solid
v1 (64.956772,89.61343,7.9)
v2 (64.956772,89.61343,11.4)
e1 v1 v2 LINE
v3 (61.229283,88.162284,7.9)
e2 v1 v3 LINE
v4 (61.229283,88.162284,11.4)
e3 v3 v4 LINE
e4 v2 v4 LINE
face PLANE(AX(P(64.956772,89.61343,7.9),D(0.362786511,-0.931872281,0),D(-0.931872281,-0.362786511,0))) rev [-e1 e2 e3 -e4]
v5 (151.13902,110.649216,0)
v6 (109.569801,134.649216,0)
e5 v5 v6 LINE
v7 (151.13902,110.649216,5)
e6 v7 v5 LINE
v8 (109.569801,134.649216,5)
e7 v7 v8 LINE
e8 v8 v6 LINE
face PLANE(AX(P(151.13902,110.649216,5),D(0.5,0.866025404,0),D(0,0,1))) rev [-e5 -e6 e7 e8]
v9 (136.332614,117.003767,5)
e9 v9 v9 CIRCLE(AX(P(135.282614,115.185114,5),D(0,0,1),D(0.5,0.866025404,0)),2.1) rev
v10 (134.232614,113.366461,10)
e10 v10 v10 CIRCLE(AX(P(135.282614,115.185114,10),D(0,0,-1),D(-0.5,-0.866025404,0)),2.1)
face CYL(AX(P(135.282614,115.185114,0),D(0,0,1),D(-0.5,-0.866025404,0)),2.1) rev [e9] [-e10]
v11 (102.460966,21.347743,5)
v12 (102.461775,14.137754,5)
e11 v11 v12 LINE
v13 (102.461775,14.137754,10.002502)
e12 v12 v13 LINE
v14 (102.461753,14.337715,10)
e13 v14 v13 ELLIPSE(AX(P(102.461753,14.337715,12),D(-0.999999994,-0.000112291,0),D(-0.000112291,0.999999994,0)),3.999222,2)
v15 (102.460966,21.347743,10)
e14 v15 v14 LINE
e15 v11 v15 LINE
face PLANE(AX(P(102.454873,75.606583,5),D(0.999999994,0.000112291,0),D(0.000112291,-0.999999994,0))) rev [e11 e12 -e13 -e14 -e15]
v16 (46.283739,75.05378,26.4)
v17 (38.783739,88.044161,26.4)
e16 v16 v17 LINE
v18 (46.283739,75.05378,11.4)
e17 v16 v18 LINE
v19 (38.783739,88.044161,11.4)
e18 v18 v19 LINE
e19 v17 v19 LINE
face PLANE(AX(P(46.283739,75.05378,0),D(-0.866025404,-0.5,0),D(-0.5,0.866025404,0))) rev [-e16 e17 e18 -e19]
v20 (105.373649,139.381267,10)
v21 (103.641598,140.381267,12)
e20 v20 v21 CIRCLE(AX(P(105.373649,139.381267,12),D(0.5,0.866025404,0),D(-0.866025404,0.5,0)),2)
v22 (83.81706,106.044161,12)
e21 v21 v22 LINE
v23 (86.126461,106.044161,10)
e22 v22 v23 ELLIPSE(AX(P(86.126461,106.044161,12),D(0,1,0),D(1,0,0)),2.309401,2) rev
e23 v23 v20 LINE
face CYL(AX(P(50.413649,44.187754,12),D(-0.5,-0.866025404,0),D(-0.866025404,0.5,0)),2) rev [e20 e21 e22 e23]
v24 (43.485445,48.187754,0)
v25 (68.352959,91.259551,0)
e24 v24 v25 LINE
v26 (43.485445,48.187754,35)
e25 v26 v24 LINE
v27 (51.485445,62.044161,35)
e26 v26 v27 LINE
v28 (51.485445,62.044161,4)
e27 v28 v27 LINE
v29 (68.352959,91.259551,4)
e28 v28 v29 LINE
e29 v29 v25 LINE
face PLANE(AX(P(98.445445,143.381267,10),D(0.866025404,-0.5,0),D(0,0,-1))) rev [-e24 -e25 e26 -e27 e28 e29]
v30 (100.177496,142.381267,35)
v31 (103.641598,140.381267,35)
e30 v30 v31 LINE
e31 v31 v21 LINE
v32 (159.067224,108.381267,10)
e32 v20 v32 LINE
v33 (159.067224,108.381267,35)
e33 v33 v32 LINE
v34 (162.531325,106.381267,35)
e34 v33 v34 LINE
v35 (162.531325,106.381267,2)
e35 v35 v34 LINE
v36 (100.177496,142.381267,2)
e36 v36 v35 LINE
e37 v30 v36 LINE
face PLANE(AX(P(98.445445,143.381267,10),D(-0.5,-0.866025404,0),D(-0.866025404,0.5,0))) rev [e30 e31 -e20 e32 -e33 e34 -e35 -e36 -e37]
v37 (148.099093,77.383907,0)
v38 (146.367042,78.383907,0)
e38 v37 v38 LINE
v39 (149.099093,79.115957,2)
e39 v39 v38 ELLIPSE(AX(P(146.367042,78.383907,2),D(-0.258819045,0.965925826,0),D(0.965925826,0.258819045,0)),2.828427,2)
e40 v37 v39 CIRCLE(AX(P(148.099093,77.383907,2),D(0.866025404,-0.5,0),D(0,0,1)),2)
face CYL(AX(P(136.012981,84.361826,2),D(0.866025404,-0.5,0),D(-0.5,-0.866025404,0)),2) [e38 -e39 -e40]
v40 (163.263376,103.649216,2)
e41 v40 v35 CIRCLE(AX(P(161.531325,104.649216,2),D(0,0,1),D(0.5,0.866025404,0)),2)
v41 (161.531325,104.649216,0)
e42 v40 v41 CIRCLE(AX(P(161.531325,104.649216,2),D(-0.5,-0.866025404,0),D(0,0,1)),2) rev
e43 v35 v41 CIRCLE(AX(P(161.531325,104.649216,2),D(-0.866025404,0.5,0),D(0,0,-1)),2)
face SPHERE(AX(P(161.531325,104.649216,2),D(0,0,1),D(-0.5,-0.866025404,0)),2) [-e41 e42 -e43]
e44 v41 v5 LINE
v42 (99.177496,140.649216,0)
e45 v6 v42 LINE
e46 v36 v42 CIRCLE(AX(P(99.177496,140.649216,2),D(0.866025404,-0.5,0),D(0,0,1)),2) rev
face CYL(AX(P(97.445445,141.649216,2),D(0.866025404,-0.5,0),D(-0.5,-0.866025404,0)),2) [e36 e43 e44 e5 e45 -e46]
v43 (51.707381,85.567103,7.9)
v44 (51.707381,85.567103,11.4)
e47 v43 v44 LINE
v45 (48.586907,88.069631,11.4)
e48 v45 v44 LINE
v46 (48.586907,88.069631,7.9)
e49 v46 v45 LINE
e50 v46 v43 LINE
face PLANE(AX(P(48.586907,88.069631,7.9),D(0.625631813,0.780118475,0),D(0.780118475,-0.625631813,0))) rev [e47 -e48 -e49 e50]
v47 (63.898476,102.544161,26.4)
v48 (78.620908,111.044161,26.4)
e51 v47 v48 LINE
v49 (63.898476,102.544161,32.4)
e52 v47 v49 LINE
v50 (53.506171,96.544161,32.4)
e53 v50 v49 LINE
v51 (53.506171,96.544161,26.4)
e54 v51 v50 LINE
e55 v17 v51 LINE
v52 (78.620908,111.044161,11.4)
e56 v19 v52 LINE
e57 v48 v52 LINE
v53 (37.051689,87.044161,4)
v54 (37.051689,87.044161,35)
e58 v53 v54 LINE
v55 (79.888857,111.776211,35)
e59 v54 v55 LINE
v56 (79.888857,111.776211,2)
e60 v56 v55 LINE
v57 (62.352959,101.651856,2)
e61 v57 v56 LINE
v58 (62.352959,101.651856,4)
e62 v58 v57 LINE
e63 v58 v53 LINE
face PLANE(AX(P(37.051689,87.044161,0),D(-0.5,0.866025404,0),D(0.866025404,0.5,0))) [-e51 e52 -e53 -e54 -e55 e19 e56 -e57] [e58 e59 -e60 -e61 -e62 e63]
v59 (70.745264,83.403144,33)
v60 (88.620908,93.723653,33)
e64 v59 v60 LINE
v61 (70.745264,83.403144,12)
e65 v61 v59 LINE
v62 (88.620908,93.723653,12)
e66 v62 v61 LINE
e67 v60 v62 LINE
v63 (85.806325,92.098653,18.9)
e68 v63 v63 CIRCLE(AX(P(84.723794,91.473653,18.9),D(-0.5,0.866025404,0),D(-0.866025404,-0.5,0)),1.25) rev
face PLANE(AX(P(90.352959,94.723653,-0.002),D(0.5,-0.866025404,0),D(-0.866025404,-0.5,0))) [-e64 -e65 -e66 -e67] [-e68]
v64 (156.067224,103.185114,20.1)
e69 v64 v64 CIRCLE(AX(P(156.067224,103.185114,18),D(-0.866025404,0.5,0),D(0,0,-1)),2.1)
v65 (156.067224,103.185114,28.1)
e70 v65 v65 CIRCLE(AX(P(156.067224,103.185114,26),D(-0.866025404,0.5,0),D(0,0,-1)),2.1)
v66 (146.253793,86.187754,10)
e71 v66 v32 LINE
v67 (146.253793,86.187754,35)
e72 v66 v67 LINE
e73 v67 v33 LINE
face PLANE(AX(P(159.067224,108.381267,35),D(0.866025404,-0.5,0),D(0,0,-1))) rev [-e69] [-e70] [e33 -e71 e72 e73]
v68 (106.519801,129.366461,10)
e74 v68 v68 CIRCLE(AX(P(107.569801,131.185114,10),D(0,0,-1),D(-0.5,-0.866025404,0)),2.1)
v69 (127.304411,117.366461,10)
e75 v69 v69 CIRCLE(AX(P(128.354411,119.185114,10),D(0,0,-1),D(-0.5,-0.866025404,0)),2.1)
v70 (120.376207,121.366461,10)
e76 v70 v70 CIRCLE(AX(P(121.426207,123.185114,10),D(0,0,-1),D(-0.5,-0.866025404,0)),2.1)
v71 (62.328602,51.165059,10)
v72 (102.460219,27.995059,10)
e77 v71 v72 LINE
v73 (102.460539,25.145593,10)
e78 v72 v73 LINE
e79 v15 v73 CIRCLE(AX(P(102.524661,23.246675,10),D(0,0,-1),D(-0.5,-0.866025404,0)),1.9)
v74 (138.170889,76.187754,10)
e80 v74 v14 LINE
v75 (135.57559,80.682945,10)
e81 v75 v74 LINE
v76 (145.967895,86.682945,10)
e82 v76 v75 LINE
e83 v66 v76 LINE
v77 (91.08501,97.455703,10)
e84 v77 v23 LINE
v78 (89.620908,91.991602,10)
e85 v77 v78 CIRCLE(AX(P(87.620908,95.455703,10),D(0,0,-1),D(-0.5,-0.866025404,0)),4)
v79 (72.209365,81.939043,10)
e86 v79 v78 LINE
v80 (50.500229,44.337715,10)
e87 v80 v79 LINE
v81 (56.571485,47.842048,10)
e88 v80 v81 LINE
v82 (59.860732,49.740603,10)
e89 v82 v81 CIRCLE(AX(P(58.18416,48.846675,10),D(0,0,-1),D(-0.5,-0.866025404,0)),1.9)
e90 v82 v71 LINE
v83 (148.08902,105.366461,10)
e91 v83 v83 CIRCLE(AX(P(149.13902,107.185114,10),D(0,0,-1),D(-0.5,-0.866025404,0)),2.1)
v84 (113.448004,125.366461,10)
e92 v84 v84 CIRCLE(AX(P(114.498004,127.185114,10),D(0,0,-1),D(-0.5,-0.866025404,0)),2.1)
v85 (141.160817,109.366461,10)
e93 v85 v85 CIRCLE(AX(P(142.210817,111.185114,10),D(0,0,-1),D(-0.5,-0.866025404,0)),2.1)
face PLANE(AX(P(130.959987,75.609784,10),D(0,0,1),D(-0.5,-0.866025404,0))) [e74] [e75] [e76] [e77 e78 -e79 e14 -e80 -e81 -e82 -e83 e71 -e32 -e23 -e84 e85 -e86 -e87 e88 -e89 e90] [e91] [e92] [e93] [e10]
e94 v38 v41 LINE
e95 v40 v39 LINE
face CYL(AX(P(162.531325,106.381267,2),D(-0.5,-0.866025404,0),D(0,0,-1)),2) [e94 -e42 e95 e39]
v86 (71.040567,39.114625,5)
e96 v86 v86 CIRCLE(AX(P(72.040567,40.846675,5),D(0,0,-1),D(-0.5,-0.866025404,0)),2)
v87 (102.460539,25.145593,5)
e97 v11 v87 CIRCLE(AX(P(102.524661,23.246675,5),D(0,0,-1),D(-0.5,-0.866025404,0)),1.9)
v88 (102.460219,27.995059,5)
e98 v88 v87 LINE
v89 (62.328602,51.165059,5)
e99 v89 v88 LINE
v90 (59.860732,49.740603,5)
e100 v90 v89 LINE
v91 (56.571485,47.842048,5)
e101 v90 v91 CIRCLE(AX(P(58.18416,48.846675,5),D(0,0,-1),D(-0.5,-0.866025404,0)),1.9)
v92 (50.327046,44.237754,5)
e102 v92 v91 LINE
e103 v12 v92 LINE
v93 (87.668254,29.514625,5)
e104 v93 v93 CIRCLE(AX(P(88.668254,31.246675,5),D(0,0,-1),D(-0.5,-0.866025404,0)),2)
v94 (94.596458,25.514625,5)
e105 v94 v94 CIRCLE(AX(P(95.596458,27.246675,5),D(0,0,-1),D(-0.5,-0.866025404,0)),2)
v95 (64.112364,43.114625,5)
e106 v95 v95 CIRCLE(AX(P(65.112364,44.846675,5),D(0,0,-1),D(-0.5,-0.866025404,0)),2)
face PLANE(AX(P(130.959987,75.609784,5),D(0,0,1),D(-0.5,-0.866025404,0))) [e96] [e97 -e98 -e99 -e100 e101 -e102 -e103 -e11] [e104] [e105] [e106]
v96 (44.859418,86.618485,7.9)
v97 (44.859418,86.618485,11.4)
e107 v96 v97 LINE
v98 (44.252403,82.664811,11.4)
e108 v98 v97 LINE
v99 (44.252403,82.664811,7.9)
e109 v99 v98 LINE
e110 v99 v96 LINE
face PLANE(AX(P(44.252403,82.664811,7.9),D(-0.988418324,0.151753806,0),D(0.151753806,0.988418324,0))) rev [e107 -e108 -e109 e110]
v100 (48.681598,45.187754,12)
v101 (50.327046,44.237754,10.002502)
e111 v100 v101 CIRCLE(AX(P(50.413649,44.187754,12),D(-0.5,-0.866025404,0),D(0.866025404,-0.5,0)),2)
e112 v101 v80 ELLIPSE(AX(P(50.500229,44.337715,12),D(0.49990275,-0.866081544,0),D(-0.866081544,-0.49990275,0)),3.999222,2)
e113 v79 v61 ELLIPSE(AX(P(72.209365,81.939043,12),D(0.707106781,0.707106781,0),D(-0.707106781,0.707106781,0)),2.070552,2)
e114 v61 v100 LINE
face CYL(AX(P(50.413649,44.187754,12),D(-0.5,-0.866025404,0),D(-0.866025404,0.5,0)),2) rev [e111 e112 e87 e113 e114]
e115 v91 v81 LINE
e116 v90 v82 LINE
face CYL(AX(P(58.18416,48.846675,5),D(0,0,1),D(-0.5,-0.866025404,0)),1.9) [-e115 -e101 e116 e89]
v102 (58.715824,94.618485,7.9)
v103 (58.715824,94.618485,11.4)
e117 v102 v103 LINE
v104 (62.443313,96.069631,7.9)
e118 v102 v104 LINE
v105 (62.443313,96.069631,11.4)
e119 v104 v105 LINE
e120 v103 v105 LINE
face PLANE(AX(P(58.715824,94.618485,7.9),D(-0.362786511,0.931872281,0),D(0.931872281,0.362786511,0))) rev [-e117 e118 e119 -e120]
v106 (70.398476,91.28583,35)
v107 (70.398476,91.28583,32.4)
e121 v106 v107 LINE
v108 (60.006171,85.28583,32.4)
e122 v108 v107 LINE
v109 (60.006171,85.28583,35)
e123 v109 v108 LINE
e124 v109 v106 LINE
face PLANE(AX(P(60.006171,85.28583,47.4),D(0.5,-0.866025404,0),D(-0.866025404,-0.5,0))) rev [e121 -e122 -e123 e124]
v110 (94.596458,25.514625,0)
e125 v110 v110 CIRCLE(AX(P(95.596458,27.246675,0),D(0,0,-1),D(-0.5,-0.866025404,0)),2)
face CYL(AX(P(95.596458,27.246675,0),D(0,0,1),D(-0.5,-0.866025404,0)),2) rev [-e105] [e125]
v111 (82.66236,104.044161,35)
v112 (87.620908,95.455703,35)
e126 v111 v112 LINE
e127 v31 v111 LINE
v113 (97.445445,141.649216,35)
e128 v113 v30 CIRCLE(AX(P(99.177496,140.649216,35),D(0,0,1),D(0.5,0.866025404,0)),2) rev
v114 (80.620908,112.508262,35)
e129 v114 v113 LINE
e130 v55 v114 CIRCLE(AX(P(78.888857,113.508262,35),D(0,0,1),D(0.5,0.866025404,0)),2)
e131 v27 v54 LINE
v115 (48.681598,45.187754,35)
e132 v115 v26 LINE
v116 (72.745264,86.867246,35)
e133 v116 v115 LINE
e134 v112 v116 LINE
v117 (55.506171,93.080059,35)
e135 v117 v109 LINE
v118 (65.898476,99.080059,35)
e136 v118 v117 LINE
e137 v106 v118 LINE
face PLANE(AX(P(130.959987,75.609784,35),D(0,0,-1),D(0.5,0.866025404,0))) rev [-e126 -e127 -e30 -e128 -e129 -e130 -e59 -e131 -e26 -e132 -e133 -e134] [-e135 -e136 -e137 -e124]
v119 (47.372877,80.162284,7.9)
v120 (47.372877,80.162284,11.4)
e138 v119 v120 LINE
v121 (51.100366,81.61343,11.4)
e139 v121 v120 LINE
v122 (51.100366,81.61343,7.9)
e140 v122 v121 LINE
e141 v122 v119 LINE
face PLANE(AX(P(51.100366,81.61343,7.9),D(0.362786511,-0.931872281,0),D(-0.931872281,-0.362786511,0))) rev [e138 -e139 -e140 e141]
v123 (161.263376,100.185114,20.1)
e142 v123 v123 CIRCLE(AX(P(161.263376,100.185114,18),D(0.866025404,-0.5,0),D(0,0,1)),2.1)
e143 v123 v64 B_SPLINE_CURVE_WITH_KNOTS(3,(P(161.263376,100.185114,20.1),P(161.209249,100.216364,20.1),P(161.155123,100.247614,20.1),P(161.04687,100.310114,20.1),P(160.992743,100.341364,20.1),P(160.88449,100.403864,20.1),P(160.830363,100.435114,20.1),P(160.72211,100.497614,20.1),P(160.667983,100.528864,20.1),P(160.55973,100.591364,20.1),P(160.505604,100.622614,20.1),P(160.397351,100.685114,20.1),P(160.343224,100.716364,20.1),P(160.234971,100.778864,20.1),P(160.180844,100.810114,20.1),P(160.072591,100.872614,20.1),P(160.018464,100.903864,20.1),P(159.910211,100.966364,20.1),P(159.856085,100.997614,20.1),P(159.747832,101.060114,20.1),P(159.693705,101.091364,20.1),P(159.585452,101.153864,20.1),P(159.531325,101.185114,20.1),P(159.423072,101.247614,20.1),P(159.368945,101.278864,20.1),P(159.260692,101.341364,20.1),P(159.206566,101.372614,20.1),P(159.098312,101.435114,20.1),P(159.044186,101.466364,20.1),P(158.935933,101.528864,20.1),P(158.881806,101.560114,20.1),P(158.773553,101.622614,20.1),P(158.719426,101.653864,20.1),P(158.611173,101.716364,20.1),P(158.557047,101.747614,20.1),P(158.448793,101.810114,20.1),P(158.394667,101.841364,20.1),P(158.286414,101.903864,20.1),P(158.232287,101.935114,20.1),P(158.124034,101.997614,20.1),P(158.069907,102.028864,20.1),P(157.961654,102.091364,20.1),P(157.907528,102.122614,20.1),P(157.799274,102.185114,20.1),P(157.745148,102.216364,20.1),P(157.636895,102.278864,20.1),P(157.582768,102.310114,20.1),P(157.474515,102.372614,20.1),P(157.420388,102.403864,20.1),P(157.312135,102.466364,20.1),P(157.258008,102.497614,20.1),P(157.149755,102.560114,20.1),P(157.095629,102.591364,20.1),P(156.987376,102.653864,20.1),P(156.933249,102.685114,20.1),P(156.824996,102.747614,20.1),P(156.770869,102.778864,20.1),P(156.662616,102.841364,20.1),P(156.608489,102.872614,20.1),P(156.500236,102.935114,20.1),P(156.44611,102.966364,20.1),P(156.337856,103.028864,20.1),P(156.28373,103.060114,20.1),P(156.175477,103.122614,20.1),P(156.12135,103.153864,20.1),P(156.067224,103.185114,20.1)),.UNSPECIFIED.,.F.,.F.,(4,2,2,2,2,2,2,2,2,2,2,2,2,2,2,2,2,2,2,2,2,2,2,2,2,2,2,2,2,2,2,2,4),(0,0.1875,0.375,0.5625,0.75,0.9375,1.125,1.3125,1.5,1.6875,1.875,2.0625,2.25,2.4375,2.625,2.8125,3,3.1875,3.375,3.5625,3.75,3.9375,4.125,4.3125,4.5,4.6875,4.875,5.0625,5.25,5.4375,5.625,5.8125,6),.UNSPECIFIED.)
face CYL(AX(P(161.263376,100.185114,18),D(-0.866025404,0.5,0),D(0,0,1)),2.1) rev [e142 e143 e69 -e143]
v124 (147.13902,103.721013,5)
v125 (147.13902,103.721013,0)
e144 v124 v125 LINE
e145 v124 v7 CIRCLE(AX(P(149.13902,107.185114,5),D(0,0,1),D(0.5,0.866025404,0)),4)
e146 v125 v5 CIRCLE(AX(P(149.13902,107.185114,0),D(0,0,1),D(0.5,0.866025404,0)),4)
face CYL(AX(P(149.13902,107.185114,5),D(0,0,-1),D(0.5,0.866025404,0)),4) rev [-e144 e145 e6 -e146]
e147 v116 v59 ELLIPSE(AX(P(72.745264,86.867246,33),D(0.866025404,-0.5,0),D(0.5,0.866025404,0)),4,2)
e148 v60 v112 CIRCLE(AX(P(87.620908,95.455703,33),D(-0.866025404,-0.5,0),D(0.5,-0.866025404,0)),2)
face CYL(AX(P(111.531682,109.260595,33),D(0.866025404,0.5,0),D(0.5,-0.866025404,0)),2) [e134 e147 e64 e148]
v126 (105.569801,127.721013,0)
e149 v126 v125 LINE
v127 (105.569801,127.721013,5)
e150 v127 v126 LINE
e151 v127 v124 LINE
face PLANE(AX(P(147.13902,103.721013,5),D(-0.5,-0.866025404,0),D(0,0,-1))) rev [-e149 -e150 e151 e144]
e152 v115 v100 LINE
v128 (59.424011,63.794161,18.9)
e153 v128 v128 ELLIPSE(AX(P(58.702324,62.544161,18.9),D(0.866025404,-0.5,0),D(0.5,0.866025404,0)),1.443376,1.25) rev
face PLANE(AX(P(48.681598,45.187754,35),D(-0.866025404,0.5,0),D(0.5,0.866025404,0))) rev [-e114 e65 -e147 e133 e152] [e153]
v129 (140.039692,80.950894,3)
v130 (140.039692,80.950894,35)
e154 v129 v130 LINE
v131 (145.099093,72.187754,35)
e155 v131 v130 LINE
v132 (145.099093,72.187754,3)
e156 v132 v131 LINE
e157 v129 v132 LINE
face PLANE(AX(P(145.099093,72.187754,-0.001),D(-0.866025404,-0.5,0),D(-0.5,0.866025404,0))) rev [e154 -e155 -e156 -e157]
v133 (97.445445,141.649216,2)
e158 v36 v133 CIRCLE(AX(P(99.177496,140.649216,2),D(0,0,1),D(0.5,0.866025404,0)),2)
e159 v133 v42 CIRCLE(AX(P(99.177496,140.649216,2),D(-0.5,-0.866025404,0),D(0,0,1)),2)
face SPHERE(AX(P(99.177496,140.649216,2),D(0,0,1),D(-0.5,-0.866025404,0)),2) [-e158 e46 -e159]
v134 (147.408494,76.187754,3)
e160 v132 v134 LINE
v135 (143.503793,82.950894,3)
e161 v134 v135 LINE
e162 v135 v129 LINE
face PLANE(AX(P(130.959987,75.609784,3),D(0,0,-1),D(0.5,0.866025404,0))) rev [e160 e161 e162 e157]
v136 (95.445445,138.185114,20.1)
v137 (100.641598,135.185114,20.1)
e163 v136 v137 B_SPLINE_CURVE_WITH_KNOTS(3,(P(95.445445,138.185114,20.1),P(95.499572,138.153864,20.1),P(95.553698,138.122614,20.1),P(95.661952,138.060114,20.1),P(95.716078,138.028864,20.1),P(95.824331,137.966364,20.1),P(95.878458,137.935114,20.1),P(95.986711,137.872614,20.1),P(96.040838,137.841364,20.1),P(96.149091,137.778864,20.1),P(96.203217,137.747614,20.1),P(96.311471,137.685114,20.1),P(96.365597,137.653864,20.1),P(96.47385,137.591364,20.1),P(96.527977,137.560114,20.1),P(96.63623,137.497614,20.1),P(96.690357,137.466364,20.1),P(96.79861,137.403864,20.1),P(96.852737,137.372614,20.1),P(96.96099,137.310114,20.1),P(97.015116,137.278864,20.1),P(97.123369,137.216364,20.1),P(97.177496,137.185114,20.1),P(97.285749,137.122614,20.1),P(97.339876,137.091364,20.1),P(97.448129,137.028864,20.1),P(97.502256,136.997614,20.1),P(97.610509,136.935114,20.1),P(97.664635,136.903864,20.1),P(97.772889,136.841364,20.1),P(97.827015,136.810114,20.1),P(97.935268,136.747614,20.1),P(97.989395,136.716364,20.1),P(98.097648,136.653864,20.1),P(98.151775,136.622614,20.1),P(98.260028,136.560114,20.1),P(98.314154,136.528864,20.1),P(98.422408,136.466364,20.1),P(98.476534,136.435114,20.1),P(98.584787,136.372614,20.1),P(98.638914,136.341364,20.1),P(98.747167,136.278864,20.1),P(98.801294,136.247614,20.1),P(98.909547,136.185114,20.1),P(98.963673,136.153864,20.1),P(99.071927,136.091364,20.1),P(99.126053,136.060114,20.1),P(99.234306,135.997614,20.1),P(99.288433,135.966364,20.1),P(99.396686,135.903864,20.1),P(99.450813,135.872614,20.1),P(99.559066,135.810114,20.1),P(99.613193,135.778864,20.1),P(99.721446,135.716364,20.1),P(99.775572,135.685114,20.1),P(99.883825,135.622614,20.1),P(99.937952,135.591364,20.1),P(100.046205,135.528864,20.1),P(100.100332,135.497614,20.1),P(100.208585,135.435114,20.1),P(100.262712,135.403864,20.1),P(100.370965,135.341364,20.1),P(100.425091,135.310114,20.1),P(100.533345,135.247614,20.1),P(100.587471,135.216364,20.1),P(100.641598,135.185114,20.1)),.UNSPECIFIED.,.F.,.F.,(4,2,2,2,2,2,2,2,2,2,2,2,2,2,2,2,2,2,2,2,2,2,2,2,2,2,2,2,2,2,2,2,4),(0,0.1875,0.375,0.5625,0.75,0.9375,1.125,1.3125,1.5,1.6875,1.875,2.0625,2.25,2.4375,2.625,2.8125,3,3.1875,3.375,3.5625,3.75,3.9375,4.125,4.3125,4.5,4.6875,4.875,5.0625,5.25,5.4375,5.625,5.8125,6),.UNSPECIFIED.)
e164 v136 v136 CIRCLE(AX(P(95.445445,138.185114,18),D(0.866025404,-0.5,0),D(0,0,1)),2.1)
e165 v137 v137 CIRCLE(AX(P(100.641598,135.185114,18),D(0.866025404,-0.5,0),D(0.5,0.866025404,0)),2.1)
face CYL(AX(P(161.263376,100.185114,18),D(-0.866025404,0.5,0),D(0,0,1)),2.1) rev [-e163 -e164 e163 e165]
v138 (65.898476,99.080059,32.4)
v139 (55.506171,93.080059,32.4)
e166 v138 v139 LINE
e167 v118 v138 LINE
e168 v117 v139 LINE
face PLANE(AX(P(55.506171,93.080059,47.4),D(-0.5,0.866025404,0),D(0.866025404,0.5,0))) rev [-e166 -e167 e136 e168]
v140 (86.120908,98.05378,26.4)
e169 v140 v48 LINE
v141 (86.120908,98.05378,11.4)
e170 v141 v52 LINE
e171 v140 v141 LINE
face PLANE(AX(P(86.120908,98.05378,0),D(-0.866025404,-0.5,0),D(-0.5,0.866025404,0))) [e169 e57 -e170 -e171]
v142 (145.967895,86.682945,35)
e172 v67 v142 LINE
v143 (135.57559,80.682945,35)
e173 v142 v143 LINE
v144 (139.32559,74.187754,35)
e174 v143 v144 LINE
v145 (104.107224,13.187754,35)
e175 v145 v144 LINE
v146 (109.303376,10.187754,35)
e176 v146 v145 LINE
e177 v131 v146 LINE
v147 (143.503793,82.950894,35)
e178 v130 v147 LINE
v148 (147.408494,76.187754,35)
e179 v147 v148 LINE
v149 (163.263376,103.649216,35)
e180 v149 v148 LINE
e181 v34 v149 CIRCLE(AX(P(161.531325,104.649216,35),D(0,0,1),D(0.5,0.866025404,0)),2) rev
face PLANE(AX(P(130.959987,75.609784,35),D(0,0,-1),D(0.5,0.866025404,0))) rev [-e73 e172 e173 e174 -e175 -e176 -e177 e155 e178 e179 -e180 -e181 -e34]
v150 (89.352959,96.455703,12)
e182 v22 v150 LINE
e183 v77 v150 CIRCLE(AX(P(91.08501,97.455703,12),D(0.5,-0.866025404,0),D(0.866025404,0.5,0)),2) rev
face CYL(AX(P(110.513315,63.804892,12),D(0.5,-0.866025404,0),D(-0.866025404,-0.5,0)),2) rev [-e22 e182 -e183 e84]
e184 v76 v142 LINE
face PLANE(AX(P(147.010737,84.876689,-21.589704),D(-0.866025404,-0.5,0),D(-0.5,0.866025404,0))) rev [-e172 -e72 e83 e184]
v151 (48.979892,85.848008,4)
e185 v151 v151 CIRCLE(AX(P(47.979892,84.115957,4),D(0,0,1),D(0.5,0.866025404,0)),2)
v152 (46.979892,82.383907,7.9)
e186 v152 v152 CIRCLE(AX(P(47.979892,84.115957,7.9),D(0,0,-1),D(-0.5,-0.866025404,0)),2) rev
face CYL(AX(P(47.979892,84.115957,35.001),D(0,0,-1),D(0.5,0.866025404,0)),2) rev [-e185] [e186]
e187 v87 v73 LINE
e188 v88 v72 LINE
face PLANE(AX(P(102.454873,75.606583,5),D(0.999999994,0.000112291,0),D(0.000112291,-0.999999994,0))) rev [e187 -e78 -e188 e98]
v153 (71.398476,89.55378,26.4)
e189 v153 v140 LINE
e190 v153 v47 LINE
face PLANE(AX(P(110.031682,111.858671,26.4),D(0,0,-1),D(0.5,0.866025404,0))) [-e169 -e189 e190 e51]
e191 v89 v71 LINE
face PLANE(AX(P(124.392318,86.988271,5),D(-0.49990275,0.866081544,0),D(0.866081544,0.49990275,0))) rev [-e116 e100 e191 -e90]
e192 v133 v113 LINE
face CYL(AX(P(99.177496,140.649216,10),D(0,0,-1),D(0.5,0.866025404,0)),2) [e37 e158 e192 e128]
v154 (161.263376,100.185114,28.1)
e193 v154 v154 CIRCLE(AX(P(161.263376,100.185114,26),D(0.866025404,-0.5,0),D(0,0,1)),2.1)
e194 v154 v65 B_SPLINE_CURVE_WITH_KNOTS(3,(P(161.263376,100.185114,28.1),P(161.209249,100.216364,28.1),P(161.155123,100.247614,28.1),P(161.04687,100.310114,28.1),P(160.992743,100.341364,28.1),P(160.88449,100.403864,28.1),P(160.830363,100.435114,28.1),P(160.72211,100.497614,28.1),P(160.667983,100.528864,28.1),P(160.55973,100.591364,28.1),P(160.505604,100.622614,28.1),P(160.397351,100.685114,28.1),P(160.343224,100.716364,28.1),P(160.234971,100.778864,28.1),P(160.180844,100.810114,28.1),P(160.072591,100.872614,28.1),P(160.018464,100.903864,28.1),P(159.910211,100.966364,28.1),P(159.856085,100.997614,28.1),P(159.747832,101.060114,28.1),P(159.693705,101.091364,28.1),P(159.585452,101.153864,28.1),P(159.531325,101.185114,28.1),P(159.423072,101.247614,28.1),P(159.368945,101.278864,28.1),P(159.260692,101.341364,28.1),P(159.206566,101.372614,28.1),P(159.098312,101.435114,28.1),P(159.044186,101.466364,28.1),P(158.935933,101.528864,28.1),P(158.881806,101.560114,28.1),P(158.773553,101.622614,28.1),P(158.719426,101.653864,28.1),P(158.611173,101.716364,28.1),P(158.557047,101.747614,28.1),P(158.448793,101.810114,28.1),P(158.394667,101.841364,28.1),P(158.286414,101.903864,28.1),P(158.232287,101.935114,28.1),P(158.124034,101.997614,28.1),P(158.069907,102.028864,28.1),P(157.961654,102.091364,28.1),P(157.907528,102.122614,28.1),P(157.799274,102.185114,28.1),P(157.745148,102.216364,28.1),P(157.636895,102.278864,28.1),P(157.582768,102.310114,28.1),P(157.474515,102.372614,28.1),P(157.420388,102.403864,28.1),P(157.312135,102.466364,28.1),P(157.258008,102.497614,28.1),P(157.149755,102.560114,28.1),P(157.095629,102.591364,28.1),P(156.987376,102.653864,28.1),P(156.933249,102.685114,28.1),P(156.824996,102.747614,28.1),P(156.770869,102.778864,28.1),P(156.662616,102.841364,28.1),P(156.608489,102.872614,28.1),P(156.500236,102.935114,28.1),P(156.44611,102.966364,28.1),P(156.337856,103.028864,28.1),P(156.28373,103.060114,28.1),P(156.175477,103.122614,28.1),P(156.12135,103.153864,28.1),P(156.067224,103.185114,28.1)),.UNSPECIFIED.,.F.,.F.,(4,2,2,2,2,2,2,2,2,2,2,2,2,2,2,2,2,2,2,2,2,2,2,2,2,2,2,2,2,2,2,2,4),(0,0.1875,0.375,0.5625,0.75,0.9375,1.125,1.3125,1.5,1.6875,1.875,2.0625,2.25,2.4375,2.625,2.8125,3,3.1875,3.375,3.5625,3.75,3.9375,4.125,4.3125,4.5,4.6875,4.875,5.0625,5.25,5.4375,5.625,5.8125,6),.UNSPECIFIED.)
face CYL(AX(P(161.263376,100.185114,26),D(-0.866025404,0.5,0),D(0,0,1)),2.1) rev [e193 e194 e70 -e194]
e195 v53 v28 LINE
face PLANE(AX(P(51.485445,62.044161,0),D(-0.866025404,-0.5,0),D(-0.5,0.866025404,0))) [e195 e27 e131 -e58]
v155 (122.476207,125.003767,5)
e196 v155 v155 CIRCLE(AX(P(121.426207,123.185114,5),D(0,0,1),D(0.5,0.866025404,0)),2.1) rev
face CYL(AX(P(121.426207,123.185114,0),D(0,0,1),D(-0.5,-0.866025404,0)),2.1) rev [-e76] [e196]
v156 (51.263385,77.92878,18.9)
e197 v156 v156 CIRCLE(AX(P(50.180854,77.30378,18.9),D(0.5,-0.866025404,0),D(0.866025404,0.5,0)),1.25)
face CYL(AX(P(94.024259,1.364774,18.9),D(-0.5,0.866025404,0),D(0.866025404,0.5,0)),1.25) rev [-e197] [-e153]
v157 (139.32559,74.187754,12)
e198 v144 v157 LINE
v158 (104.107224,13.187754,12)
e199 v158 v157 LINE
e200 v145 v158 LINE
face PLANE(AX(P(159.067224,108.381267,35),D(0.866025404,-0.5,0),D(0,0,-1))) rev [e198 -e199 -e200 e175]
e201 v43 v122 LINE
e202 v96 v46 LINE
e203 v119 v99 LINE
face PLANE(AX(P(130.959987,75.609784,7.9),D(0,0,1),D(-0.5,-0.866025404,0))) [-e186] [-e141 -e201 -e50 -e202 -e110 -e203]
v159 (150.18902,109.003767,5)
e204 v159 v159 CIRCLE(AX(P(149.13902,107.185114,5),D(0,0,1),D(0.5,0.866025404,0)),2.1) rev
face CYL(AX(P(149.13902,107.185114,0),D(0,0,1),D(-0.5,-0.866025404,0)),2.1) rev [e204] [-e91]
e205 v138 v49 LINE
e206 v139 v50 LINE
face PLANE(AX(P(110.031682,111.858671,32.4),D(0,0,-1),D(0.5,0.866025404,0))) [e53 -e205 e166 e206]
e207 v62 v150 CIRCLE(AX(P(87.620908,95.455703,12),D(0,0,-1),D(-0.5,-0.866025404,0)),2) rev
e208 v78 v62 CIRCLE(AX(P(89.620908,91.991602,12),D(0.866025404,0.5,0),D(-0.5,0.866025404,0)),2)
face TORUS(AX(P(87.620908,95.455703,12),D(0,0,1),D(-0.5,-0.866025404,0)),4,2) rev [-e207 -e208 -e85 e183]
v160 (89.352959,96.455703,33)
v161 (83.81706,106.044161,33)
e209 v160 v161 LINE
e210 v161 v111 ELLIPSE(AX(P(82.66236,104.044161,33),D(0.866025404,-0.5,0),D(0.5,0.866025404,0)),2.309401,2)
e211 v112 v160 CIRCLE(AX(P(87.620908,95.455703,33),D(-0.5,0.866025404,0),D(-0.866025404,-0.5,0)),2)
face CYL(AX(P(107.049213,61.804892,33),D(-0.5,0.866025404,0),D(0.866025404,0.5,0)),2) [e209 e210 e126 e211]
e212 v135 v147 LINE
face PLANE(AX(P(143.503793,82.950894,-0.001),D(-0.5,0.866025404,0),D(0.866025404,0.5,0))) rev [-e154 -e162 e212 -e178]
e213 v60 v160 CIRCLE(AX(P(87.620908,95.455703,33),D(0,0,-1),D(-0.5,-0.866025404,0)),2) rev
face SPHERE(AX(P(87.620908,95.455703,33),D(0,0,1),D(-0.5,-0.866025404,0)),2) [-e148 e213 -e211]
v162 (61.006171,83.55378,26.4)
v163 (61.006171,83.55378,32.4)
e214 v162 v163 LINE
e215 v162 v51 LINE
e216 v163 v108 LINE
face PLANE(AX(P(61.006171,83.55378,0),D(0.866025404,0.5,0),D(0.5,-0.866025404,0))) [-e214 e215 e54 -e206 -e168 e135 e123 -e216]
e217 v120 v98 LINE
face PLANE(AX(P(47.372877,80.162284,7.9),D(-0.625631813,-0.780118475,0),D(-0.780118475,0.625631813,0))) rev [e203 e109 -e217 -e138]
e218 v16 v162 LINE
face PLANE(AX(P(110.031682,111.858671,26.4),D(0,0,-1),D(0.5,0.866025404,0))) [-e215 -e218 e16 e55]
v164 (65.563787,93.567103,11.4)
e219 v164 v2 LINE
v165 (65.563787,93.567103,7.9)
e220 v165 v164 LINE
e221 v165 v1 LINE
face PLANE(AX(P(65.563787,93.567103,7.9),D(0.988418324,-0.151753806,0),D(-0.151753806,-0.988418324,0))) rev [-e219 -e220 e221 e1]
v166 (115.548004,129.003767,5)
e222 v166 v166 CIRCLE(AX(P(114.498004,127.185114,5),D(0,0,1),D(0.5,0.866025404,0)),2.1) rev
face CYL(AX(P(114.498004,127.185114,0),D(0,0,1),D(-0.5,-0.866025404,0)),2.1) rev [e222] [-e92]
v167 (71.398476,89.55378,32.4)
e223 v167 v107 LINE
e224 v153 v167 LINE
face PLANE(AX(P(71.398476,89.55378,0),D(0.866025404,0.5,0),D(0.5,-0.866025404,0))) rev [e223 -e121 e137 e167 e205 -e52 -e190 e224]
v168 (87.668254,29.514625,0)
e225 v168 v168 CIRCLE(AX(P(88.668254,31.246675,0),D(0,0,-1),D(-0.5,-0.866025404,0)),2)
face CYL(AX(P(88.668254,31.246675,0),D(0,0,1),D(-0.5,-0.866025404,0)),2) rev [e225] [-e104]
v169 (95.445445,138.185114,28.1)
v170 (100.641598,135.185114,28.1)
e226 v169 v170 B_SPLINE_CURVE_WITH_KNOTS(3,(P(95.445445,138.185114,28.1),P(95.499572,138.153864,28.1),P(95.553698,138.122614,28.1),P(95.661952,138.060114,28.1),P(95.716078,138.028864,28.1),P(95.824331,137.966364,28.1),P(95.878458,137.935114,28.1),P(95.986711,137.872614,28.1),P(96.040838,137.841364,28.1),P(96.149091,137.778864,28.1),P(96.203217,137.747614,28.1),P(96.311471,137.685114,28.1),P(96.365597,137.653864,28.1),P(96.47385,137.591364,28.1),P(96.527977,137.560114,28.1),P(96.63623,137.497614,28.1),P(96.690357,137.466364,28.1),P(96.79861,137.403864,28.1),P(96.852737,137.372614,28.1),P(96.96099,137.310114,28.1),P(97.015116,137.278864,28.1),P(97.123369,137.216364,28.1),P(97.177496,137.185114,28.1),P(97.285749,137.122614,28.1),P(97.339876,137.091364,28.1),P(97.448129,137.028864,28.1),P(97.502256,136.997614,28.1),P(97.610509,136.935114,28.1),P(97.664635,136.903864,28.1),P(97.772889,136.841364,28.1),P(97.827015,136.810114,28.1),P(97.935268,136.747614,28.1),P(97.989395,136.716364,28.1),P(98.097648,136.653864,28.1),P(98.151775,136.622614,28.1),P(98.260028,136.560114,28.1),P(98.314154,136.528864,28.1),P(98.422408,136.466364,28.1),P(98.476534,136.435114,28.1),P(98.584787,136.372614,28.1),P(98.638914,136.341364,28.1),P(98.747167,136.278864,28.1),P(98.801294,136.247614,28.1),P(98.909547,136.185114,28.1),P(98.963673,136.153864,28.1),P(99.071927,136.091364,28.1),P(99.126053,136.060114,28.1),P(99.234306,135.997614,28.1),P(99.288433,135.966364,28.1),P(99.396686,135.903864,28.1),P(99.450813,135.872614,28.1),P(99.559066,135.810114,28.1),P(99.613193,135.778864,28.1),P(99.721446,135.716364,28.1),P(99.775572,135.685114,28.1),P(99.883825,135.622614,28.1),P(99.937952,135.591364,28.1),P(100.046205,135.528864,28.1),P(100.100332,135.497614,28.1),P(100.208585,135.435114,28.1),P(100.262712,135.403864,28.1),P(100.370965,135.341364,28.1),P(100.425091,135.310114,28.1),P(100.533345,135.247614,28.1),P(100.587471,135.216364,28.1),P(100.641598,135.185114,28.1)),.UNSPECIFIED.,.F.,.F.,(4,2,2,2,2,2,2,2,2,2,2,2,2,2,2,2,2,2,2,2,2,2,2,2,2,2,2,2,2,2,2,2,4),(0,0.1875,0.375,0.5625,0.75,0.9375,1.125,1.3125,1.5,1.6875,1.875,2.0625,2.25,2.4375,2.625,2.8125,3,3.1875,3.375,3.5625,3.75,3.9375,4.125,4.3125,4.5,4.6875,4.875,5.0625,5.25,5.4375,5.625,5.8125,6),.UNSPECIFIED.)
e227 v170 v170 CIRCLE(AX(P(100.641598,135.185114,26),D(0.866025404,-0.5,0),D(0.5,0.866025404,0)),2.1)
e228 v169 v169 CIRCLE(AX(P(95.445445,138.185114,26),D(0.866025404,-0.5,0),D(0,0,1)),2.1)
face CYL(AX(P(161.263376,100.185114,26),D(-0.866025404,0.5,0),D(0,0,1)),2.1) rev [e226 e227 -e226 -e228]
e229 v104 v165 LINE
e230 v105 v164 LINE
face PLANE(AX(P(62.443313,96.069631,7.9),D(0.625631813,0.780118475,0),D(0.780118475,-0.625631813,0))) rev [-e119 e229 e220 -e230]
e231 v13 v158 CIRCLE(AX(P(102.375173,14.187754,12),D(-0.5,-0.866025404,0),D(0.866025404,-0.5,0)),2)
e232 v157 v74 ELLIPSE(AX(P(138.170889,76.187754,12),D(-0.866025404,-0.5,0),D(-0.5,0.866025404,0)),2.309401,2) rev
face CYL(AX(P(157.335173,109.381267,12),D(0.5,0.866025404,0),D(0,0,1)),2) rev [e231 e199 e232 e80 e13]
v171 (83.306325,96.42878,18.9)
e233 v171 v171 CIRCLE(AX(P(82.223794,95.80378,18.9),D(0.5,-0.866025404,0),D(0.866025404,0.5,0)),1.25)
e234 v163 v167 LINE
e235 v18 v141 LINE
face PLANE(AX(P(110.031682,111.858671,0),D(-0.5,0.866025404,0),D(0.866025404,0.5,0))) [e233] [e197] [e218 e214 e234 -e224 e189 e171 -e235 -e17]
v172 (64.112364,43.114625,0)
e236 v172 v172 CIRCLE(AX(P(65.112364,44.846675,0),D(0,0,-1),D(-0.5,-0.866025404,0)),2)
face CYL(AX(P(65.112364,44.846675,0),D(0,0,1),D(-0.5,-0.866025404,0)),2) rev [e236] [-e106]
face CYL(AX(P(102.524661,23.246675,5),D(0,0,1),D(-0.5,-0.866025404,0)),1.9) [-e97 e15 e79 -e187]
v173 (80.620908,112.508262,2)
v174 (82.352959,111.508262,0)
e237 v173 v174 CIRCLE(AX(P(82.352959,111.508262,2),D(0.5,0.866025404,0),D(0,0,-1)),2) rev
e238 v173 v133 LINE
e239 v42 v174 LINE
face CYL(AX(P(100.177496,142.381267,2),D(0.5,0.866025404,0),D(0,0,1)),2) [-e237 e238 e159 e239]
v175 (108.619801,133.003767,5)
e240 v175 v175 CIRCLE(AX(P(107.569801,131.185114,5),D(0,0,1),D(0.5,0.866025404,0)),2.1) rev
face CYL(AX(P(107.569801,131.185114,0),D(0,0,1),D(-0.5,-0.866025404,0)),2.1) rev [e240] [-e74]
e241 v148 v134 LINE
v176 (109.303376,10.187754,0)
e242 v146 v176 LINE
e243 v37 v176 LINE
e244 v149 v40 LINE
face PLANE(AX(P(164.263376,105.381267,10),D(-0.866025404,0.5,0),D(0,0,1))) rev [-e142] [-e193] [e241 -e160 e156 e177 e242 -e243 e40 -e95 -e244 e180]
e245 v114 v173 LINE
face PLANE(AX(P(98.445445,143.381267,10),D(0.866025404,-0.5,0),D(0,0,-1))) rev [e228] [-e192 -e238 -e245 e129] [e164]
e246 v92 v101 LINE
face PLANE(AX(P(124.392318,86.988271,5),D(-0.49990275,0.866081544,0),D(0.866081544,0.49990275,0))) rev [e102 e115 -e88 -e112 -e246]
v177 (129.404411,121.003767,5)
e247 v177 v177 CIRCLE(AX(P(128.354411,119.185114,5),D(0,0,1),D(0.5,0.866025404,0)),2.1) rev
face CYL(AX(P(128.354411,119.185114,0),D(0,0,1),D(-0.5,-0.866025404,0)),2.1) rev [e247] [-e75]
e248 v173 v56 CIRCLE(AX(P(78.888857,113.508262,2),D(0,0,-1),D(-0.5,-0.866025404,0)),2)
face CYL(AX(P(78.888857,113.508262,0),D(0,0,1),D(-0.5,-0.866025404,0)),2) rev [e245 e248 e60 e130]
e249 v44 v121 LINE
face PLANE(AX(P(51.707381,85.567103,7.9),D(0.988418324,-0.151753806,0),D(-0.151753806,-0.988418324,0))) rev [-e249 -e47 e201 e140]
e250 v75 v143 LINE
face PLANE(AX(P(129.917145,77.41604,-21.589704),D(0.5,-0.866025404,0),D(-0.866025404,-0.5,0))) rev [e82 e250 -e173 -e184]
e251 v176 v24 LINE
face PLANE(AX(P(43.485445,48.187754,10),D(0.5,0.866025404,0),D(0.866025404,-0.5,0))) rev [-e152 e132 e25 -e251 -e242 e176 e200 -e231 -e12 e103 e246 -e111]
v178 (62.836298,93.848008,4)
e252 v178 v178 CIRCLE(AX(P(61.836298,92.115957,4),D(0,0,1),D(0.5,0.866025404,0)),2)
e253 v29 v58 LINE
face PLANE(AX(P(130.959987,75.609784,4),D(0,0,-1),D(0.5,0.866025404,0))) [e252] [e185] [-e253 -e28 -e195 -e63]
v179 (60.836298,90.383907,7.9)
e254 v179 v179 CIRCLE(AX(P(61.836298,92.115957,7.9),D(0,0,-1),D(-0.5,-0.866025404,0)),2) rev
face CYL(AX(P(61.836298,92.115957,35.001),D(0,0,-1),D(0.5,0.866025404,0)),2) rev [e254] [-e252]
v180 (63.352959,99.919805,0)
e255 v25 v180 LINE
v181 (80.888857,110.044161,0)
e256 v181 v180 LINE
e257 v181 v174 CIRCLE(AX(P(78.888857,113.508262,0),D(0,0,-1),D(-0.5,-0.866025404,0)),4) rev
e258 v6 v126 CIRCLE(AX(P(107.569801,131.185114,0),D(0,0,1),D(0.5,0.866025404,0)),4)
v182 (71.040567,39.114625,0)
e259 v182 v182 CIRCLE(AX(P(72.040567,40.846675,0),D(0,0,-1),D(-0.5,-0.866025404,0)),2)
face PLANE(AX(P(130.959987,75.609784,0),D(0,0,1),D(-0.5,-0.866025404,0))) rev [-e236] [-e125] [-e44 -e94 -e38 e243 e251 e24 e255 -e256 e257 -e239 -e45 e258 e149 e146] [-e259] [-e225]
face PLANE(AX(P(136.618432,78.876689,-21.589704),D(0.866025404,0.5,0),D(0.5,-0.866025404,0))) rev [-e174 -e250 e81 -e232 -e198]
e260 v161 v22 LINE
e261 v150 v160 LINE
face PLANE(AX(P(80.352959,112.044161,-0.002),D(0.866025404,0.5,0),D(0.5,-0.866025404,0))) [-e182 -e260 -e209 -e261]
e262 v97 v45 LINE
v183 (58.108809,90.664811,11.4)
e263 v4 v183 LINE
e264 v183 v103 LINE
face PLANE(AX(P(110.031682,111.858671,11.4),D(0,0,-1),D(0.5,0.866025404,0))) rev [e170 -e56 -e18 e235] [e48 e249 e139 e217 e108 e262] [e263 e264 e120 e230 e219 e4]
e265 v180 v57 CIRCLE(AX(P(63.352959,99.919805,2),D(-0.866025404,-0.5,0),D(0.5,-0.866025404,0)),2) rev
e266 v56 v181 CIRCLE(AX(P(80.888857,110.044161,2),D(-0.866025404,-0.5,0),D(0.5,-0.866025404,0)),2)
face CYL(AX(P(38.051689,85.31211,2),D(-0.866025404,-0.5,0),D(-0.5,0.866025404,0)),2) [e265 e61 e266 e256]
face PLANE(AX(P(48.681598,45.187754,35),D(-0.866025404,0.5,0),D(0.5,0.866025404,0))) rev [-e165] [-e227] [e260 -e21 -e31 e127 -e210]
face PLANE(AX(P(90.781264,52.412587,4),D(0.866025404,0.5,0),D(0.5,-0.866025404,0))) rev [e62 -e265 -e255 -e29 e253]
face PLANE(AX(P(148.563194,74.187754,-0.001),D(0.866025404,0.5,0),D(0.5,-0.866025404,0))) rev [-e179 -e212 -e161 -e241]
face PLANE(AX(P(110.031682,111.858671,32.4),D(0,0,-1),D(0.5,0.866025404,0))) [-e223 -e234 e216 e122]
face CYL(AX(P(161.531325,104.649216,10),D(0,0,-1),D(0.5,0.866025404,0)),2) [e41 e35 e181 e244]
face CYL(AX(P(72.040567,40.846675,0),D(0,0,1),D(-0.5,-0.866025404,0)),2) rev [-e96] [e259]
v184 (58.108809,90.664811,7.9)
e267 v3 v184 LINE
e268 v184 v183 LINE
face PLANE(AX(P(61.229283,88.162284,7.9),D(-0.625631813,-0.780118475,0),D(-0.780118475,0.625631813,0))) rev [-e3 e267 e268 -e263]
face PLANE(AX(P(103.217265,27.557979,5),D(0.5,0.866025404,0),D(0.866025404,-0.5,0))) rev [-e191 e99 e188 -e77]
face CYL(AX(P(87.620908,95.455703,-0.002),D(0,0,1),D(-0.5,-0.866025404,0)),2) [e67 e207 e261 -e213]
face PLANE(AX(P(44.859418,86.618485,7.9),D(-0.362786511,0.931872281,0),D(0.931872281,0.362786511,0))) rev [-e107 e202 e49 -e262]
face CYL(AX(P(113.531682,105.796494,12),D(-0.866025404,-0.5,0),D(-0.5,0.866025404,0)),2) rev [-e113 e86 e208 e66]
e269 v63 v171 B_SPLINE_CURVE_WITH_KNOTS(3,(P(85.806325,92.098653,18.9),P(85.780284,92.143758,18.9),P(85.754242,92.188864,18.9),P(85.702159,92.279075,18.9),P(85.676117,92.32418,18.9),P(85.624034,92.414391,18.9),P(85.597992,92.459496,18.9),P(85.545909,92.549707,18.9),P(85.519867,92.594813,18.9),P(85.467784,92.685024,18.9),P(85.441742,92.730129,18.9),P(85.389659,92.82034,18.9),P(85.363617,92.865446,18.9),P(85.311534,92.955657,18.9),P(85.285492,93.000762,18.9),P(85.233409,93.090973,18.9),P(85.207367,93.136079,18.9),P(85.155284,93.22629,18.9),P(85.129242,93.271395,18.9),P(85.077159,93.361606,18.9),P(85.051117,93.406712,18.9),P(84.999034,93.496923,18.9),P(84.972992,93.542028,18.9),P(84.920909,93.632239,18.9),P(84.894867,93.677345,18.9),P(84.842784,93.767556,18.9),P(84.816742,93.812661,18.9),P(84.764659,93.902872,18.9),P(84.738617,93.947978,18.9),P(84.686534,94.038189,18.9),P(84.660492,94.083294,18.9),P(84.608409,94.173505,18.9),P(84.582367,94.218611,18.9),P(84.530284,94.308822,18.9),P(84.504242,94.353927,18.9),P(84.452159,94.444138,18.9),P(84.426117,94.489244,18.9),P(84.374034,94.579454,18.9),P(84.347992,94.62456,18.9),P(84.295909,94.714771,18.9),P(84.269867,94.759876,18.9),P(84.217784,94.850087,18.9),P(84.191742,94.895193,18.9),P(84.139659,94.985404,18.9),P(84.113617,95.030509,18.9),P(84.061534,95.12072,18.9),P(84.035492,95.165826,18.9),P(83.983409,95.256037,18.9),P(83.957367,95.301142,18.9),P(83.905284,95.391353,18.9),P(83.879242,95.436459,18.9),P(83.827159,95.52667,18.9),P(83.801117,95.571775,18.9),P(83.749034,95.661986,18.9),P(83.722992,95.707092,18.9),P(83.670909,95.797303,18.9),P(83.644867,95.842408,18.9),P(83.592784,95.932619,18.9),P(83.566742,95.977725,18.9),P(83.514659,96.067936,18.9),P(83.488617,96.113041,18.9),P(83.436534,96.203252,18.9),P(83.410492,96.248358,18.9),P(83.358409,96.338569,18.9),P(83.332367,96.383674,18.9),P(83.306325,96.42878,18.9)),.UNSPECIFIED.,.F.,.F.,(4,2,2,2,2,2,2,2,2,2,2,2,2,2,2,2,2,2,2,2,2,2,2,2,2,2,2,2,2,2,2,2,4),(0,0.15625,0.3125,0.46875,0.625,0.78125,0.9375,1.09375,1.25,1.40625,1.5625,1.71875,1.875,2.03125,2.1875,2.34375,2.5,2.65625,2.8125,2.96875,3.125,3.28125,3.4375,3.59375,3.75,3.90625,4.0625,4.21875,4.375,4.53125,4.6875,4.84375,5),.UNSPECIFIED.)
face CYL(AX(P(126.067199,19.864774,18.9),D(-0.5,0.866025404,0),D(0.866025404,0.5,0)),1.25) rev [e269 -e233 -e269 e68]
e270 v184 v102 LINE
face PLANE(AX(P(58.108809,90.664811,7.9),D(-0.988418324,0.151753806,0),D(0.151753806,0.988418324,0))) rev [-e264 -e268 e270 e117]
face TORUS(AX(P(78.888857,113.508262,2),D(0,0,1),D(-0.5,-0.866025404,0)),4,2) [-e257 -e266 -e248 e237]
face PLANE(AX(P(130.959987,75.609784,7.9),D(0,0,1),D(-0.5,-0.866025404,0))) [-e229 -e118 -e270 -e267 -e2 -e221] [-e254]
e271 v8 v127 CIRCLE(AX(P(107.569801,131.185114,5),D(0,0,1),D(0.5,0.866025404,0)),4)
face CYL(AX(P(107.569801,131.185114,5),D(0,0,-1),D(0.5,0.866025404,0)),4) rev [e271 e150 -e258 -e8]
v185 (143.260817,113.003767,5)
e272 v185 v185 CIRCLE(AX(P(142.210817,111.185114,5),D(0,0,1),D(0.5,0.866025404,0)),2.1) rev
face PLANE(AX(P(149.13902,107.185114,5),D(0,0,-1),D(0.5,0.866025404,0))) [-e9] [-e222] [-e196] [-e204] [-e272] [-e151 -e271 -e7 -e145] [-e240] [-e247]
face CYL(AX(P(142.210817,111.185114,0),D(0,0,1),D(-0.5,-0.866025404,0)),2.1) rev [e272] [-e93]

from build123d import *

# Parameters (mm, degrees)
SKETCH_2_W               = 109.92
SKETCH_2_H               = 76
EXTRUDE_1_DEPTH          = 10
CUT_EXTRUDE_1_DEPTH      = 5
SKETCH_4_R               = 2
CUT_EXTRUDE_2_DEPTH      = 92.808295873
SKETCH_5_W               = 109.92
SKETCH_5_H               = 6
EXTRUDE_2_DEPTH          = 25
CUT_EXTRUDE_3_DEPTH      = 104.340627651
CUT_EXTRUDE_3_DEPTH_BACK = 104.340627651
SKETCH_7_R               = 2.1
SKETCH_9_R               = 2.1
CUT_EXTRUDE_4_DEPTH      = 96.019804204
CUT_EXTRUDE_5_DEPTH      = 5
EXTRUDE_3_DEPTH          = 35
EXTRUDE_4_DEPTH          = 35
SKETCH_13_W              = 46
SKETCH_13_H              = 15
SKETCH_13_W_2            = 12
SKETCH_13_H_2            = 6
CUT_EXTRUDE_6_DEPTH      = 15
CUT_EXTRUDE_7_DEPTH      = 15
SKETCH_15_R              = 1.25
CUT_EXTRUDE_8_DEPTH      = 28.709519
EXTRUDE_5_DEPTH          = 35
CUT_EXTRUDE_10_DEPTH     = 4
CUT_EXTRUDE_11_REACH     = 116.42
SKETCH_22_R              = 2
CUT_EXTRUDE_12_DEPTH     = 3.5
CUT_EXTRUDE_14_REACH     = 117.568
EXTRUDE_6_DEPTH          = 3
EXTRUDE_7_REACH          = 117.568
SKETCH_27_W              = 4.526779154
SKETCH_27_H              = 4.806116501
FILLET_1_R               = 2
CUT_EXTRUDE_15_REACH     = 117.568
SKETCH_28_W              = 4.526779154
SKETCH_28_H              = 4.806116501


with BuildPart() as part:
    # 草圖2 → 填料-伸長1 (new body)
    with BuildSketch(Plane.XY):
        with Locations((12.52544527, 24.044160626)):
            Rectangle(SKETCH_2_W, SKETCH_2_H)
    extrude(amount=EXTRUDE_1_DEPTH)

    # 草圖3 → 除料-伸長1 (cut)
    with BuildSketch(Plane.XY.offset(10)):
        with BuildLine():
            Line((67.48544527, -6.055839374), (67.48544527, 54.144160626))
            Line((67.48544527, 54.144160626), (61.24181631, 50.538464901))
            ThreePointArc((61.24181631, 50.538464901), (61.408690367, 50.105080914), (61.46544527, 49.644160626))
            ThreePointArc((61.46544527, 49.644160626), (60.088104264, 47.81746208), (57.95299519, 48.639170705))
            Line((57.95299519, 48.639170705), (55.48544527, 47.214160626))
            Line((55.48544527, 47.214160626), (55.48544527, 0.874160626))
            Line((55.48544527, 0.874160626), (57.95299519, -0.550849453))
            ThreePointArc((57.95299519, -0.550849453), (60.088104264, 0.270859171), (61.46544527, -1.555839374))
            ThreePointArc((61.46544527, -1.555839374), (61.408690367, -2.016759663), (61.24181631, -2.45014365))
            Line((61.24181631, -2.45014365), (67.48544527, -6.055839374))
        make_face()
    extrude(amount=-CUT_EXTRUDE_1_DEPTH, mode=Mode.SUBTRACT)

    # 草圖4 → 除料-伸長2 (cut, through all)
    with BuildSketch(Plane.XY.offset(5)):
        with Locations((59.56544527, 41.644160626)):
            Circle(SKETCH_4_R)
        with Locations((59.56544527, 33.644160626)):
            Circle(SKETCH_4_R)
        with Locations((59.56544527, 6.444160626)):
            Circle(SKETCH_4_R)
        with Locations((59.56544527, 14.444160626)):
            Circle(SKETCH_4_R)
    extrude(amount=-CUT_EXTRUDE_2_DEPTH, mode=Mode.SUBTRACT)

    # 草圖5 → 填料-伸長2 (add)
    with BuildSketch(Plane.XY.offset(10)):
        with Locations((12.52544527, -10.955839374)):
            Rectangle(SKETCH_5_W, SKETCH_5_H)
        with Locations((12.52544527, 59.044160626)):
            Rectangle(SKETCH_5_W, SKETCH_5_H)
    extrude(amount=EXTRUDE_2_DEPTH)

    # 草圖7 → 除料-伸長3 (cut, two sides: drawn at the far end of the back side and taken through both)
    with BuildSketch(Plane(origin=(0, -7.955839374, 0), x_dir=(1, 0, 0), z_dir=(0, 1, 0)).offset(-CUT_EXTRUDE_3_DEPTH_BACK)):
        with Locations(Location((-36.43455473, -18, 0), (0, 0, 270))):
            Circle(SKETCH_7_R)
        with Locations(Location((-36.43455473, -26, 0), (0, 0, 270))):
            Circle(SKETCH_7_R)
    extrude(amount=CUT_EXTRUDE_3_DEPTH + CUT_EXTRUDE_3_DEPTH_BACK, mode=Mode.SUBTRACT)

    # 草圖9 → 除料-伸長4 (cut, through all)
    with BuildSketch(Plane.XY.offset(10)):
        with Locations((-36.43455473, 0.044160626)):
            Circle(SKETCH_9_R)
        with Locations((-36.43455473, 8.044160626)):
            Circle(SKETCH_9_R)
        with Locations((-36.43455473, 16.044160626)):
            Circle(SKETCH_9_R)
        with Locations((-36.43455473, 24.044160626)):
            Circle(SKETCH_9_R)
        with Locations((-36.43455473, 32.044160626)):
            Circle(SKETCH_9_R)
        with Locations((-36.43455473, 40.044160626)):
            Circle(SKETCH_9_R)
        with Locations((-36.43455473, 48.044160626)):
            Circle(SKETCH_9_R)
    extrude(amount=-CUT_EXTRUDE_4_DEPTH, mode=Mode.SUBTRACT)

    # 草圖10 → 除料-伸長5 (cut)
    with BuildSketch(Plane(origin=(0, 0, 0), x_dir=(-1, 0, 0), z_dir=(0, 0, -1))):
        with BuildLine():
            Line((32.43455473, 0.044160626), (32.43455473, 48.044160626))
            ThreePointArc((32.43455473, 48.044160626), (36.43455473, 52.044160626), (40.43455473, 48.044160626))
            Line((40.43455473, 48.044160626), (40.43455473, 0.044160626))
            ThreePointArc((40.43455473, 0.044160626), (36.43455473, -3.955839374), (32.43455473, 0.044160626))
        make_face()
    extrude(amount=-CUT_EXTRUDE_5_DEPTH, mode=Mode.SUBTRACT)

    # 草圖11 → 填料-伸長3 (add, through all)
    with BuildSketch(Plane.XY.offset(35)):
        Polygon((51.48544527, 62.044160626), (37.05168854, 87.044160626), (-6.249581649, 62.044160626), align=None)
    extrude(amount=-EXTRUDE_3_DEPTH)

    # 草圖12 → 填料-伸長4 (add)
    with BuildSketch(Plane.XY.offset(35)):
        Polygon((-6.249581649, 62.044160626), (37.05168854, 87.044160626), (47.05168854, 69.72365255), (3.750418351, 44.72365255), align=None)
    extrude(amount=-EXTRUDE_4_DEPTH)

    # 草圖13 → 除料-伸長6 (cut)
    with BuildSketch(Plane(origin=(-28.428305041, 49.239268705, 0), x_dir=(0.8660254037844416, 0.4999999999999949, 0), z_dir=(-0.4999999999999949, 0.8660254037844416, 0))):
        with Locations((50.609783842, -18.9)):
            Rectangle(SKETCH_13_W, SKETCH_13_H)
        with Locations((50.609783842, -29.4)):
            Rectangle(SKETCH_13_W_2, SKETCH_13_H_2)
    extrude(amount=-CUT_EXTRUDE_6_DEPTH, mode=Mode.SUBTRACT)

    # 草圖14 → 除料-伸長7 (cut)
    with BuildSketch(Plane(origin=(0, 0, 32.4), x_dir=(-1, 0, 0), z_dir=(0, 0, -1))):
        Polygon((-22.597205868, 74.080059011), (-27.097205868, 66.285830377), (-16.704901023, 60.285830377), (-12.204901023, 68.080059011), align=None)
    extrude(amount=-CUT_EXTRUDE_7_DEPTH, mode=Mode.SUBTRACT)

    # 草圖15 → 除料-伸長8 (cut)
    with BuildSketch(Plane(origin=(-20.928305041, 36.248887648, 0), x_dir=(0.8660254037844417, 0.4999999999999947, 0), z_dir=(-0.49999999999999484, 0.8660254037844418, 0))):
        with Locations(Location((69.109783842, -18.9, 0), (0, 0, 180))):
            Circle(SKETCH_15_R)
        with Locations(Location((32.109783842, -18.9, 0), (0, 0, 180))):
            Circle(SKETCH_15_R)
    extrude(amount=-CUT_EXTRUDE_8_DEPTH, mode=Mode.SUBTRACT)

    # 草圖18 → 填料-伸長5 (add)
    with BuildSketch(Plane.XY.offset(35)):
        Polygon((-13.593592417, -13.522826672), (-13.343592417, -13.955839374), (-8.724790263, -13.955839374), (-10.129490801, -11.522826672), align=None)
        Polygon((-17.093592417, -7.460648846), (-13.593592417, -13.522826672), (-10.129490801, -11.522826672), (-6.665389186, -9.522826672), (-3.201287571, -7.522826672), (-6.701287571, -1.460648846), align=None)
        Polygon((-3.201287571, -7.522826672), (-6.665389186, -9.522826672), (-4.10598811, -13.955839374), (0.512814044, -13.955839374), align=None)
    extrude(amount=-EXTRUDE_5_DEPTH)

    # 草圖21 → 除料-伸長10 (cut)
    with BuildSketch(Plane(origin=(0, 0, 0), x_dir=(-1, 0, 0), z_dir=(0, 0, -1))):
        Polygon((-37.05168854, 87.044160626), (-43.05168854, 76.65185578), (-51.48544527, 62.044160626), (-17.750418351, 62.044160626), (-11.750418351, 72.436465471), align=None)
    extrude(amount=-CUT_EXTRUDE_10_DEPTH, mode=Mode.SUBTRACT)

    # 草圖22 → 除料-伸長11 (cut, up to next)
    with BuildSketch(Plane(origin=(0, 0, 4), x_dir=(-1, 0, 0), z_dir=(0, 0, -1)), mode=Mode.PRIVATE) as cut_extrude_11_sk1:
        with Locations((-34.12348531, 76.115957396)):
            Circle(SKETCH_22_R)
    cut_extrude_11_tool1 = extrude(cut_extrude_11_sk1.sketch, amount=-CUT_EXTRUDE_11_REACH, mode=Mode.PRIVATE) & part.part
    # 草圖22 → 除料-伸長11 (cut, up to next)
    with BuildSketch(Plane(origin=(0, 0, 4), x_dir=(-1, 0, 0), z_dir=(0, 0, -1)), mode=Mode.PRIVATE) as cut_extrude_11_sk2:
        with Locations((-20.267078849, 68.115957396)):
            Circle(SKETCH_22_R)
    cut_extrude_11_tool2 = extrude(cut_extrude_11_sk2.sketch, amount=-CUT_EXTRUDE_11_REACH, mode=Mode.PRIVATE) & part.part
    add(cut_extrude_11_tool1.solids().sort_by_distance((34.123485, 76.115957, 4))[0], mode=Mode.SUBTRACT)
    add(cut_extrude_11_tool2.solids().sort_by_distance((20.267079, 68.115957, 4))[0], mode=Mode.SUBTRACT)

    # 草圖23 → 除料-伸長12 (cut)
    with BuildSketch(Plane.XY.offset(11.4)):
        Polygon((16.539589727, 69.567103439), (17.14660495, 65.613430145), (20.874094073, 64.162284101), (23.994567972, 66.664811352), (23.387552749, 70.618484646), (19.660063626, 72.06963069), align=None)
        Polygon((30.395996187, 77.567103439), (31.00301141, 73.613430145), (34.730500533, 72.162284101), (37.850974433, 74.664811352), (37.24395921, 78.618484646), (33.516470087, 80.06963069), align=None)
    extrude(amount=-CUT_EXTRUDE_12_DEPTH, mode=Mode.SUBTRACT)

    # 草圖24 → 除料-伸長14 (cut, up to next)
    with BuildSketch(Plane.XY.offset(35), mode=Mode.PRIVATE) as cut_extrude_14_sk1:
        Polygon((-7.570089725, -15.955839374), (-4.10598811, -13.955839374), (-9.165389186, -5.192699653), (-12.629490801, -7.192699653), align=None)
    cut_extrude_14_tool1 = extrude(cut_extrude_14_sk1.sketch, amount=-CUT_EXTRUDE_14_REACH, mode=Mode.PRIVATE) & part.part
    add(cut_extrude_14_tool1.solids().sort_by_distance((-8.367739, -10.57427, 35))[0], mode=Mode.SUBTRACT)

    # 草圖25 → 填料-伸長6 (add)
    with BuildSketch(Plane(origin=(0, 0, 0), x_dir=(-1, 0, 0), z_dir=(0, 0, -1))):
        Polygon((8.724790263, -13.955839374), (4.10598811, -13.955839374), (9.165389186, -5.192699653), (12.629490801, -7.192699653), align=None)
    extrude(amount=-EXTRUDE_6_DEPTH)

    # 填料-伸長7: up to this face of the body (flat: up to its plane)
    extrude_7_end = Plane(part.part.faces().sort_by_distance((14.81484306, 24.690999313, 0))[0])
    # 草圖27 → 填料-伸長7 (add, up to the picked face)
    with BuildSketch(Plane.XY.offset(35), mode=Mode.PRIVATE) as extrude_7_sk1:
        with Locations((-9.842598533, -16.358897625)):
            Rectangle(SKETCH_27_W, SKETCH_27_H)
    extrude_7_tool1 = split(extrude(extrude_7_sk1.sketch, amount=-EXTRUDE_7_REACH, mode=Mode.PRIVATE), bisect_by=extrude_7_end, keep=Keep.BOTH, mode=Mode.PRIVATE)
    add(extrude_7_tool1.solids().sort_by(Axis((-9.842599, -16.358898, 35), (0, 0, -1)))[0])

    # 圓角1
    fillet_1_edges = [part.edges().sort_by_distance(p)[0] for p in [
        (-24.34206819, 62.044160626, 0),
        (-6.249581649, 62.044160626, 17.5),
        (45.421779388, 56.044160626, 10),
        (0.482469159, 50.383906588, 10),
        (13.554265928, 50.383906588, 10),
        (3.750418351, 44.72365255, 22.5),
        (0.482469159, 50.383906588, 35),
        (13.554265928, 50.383906588, 35),
        (2.750418351, 67.240313048, 0),
        (-12.10598811, -16.358897625, 0),
        (-27.27027142, -13.955839374, 0),
        (32.267078849, -7.955839374, 10),
        (-42.43455473, 24.044160626, 0),
        (-22.610017382, 56.044160626, 10),
        (-42.43455473, 62.044160626, 17.5),
        (-42.43455473, -13.955839374, 17.5),
    ]]
    fillet(fillet_1_edges, radius=FILLET_1_R - 0.0001)  # a hair under: the kernel refuses the full size

    # 草圖28 → 除料-伸長15 (cut, up to next)
    with BuildSketch(Plane.XY.offset(35), mode=Mode.PRIVATE) as cut_extrude_15_sk1:
        with Locations((-9.842598533, -16.358897625)):
            Rectangle(SKETCH_28_W, SKETCH_28_H)
    cut_extrude_15_tool1 = extrude(cut_extrude_15_sk1.sketch, amount=-CUT_EXTRUDE_15_REACH, mode=Mode.PRIVATE) & part.part
    add(cut_extrude_15_tool1.solids().sort_by_distance((-9.842599, -16.358898, 35))[0], mode=Mode.SUBTRACT)


with BuildPart() as body_2:
    # 鏡射1: mirrored copy
    add(part.part.mirror(Plane(origin=(51.48544527, 62.044160626, 0), x_dir=(0, 0, 1), z_dir=(0.8660254037844434, 0.4999999999999917, 0))))


solid = body_2.part
